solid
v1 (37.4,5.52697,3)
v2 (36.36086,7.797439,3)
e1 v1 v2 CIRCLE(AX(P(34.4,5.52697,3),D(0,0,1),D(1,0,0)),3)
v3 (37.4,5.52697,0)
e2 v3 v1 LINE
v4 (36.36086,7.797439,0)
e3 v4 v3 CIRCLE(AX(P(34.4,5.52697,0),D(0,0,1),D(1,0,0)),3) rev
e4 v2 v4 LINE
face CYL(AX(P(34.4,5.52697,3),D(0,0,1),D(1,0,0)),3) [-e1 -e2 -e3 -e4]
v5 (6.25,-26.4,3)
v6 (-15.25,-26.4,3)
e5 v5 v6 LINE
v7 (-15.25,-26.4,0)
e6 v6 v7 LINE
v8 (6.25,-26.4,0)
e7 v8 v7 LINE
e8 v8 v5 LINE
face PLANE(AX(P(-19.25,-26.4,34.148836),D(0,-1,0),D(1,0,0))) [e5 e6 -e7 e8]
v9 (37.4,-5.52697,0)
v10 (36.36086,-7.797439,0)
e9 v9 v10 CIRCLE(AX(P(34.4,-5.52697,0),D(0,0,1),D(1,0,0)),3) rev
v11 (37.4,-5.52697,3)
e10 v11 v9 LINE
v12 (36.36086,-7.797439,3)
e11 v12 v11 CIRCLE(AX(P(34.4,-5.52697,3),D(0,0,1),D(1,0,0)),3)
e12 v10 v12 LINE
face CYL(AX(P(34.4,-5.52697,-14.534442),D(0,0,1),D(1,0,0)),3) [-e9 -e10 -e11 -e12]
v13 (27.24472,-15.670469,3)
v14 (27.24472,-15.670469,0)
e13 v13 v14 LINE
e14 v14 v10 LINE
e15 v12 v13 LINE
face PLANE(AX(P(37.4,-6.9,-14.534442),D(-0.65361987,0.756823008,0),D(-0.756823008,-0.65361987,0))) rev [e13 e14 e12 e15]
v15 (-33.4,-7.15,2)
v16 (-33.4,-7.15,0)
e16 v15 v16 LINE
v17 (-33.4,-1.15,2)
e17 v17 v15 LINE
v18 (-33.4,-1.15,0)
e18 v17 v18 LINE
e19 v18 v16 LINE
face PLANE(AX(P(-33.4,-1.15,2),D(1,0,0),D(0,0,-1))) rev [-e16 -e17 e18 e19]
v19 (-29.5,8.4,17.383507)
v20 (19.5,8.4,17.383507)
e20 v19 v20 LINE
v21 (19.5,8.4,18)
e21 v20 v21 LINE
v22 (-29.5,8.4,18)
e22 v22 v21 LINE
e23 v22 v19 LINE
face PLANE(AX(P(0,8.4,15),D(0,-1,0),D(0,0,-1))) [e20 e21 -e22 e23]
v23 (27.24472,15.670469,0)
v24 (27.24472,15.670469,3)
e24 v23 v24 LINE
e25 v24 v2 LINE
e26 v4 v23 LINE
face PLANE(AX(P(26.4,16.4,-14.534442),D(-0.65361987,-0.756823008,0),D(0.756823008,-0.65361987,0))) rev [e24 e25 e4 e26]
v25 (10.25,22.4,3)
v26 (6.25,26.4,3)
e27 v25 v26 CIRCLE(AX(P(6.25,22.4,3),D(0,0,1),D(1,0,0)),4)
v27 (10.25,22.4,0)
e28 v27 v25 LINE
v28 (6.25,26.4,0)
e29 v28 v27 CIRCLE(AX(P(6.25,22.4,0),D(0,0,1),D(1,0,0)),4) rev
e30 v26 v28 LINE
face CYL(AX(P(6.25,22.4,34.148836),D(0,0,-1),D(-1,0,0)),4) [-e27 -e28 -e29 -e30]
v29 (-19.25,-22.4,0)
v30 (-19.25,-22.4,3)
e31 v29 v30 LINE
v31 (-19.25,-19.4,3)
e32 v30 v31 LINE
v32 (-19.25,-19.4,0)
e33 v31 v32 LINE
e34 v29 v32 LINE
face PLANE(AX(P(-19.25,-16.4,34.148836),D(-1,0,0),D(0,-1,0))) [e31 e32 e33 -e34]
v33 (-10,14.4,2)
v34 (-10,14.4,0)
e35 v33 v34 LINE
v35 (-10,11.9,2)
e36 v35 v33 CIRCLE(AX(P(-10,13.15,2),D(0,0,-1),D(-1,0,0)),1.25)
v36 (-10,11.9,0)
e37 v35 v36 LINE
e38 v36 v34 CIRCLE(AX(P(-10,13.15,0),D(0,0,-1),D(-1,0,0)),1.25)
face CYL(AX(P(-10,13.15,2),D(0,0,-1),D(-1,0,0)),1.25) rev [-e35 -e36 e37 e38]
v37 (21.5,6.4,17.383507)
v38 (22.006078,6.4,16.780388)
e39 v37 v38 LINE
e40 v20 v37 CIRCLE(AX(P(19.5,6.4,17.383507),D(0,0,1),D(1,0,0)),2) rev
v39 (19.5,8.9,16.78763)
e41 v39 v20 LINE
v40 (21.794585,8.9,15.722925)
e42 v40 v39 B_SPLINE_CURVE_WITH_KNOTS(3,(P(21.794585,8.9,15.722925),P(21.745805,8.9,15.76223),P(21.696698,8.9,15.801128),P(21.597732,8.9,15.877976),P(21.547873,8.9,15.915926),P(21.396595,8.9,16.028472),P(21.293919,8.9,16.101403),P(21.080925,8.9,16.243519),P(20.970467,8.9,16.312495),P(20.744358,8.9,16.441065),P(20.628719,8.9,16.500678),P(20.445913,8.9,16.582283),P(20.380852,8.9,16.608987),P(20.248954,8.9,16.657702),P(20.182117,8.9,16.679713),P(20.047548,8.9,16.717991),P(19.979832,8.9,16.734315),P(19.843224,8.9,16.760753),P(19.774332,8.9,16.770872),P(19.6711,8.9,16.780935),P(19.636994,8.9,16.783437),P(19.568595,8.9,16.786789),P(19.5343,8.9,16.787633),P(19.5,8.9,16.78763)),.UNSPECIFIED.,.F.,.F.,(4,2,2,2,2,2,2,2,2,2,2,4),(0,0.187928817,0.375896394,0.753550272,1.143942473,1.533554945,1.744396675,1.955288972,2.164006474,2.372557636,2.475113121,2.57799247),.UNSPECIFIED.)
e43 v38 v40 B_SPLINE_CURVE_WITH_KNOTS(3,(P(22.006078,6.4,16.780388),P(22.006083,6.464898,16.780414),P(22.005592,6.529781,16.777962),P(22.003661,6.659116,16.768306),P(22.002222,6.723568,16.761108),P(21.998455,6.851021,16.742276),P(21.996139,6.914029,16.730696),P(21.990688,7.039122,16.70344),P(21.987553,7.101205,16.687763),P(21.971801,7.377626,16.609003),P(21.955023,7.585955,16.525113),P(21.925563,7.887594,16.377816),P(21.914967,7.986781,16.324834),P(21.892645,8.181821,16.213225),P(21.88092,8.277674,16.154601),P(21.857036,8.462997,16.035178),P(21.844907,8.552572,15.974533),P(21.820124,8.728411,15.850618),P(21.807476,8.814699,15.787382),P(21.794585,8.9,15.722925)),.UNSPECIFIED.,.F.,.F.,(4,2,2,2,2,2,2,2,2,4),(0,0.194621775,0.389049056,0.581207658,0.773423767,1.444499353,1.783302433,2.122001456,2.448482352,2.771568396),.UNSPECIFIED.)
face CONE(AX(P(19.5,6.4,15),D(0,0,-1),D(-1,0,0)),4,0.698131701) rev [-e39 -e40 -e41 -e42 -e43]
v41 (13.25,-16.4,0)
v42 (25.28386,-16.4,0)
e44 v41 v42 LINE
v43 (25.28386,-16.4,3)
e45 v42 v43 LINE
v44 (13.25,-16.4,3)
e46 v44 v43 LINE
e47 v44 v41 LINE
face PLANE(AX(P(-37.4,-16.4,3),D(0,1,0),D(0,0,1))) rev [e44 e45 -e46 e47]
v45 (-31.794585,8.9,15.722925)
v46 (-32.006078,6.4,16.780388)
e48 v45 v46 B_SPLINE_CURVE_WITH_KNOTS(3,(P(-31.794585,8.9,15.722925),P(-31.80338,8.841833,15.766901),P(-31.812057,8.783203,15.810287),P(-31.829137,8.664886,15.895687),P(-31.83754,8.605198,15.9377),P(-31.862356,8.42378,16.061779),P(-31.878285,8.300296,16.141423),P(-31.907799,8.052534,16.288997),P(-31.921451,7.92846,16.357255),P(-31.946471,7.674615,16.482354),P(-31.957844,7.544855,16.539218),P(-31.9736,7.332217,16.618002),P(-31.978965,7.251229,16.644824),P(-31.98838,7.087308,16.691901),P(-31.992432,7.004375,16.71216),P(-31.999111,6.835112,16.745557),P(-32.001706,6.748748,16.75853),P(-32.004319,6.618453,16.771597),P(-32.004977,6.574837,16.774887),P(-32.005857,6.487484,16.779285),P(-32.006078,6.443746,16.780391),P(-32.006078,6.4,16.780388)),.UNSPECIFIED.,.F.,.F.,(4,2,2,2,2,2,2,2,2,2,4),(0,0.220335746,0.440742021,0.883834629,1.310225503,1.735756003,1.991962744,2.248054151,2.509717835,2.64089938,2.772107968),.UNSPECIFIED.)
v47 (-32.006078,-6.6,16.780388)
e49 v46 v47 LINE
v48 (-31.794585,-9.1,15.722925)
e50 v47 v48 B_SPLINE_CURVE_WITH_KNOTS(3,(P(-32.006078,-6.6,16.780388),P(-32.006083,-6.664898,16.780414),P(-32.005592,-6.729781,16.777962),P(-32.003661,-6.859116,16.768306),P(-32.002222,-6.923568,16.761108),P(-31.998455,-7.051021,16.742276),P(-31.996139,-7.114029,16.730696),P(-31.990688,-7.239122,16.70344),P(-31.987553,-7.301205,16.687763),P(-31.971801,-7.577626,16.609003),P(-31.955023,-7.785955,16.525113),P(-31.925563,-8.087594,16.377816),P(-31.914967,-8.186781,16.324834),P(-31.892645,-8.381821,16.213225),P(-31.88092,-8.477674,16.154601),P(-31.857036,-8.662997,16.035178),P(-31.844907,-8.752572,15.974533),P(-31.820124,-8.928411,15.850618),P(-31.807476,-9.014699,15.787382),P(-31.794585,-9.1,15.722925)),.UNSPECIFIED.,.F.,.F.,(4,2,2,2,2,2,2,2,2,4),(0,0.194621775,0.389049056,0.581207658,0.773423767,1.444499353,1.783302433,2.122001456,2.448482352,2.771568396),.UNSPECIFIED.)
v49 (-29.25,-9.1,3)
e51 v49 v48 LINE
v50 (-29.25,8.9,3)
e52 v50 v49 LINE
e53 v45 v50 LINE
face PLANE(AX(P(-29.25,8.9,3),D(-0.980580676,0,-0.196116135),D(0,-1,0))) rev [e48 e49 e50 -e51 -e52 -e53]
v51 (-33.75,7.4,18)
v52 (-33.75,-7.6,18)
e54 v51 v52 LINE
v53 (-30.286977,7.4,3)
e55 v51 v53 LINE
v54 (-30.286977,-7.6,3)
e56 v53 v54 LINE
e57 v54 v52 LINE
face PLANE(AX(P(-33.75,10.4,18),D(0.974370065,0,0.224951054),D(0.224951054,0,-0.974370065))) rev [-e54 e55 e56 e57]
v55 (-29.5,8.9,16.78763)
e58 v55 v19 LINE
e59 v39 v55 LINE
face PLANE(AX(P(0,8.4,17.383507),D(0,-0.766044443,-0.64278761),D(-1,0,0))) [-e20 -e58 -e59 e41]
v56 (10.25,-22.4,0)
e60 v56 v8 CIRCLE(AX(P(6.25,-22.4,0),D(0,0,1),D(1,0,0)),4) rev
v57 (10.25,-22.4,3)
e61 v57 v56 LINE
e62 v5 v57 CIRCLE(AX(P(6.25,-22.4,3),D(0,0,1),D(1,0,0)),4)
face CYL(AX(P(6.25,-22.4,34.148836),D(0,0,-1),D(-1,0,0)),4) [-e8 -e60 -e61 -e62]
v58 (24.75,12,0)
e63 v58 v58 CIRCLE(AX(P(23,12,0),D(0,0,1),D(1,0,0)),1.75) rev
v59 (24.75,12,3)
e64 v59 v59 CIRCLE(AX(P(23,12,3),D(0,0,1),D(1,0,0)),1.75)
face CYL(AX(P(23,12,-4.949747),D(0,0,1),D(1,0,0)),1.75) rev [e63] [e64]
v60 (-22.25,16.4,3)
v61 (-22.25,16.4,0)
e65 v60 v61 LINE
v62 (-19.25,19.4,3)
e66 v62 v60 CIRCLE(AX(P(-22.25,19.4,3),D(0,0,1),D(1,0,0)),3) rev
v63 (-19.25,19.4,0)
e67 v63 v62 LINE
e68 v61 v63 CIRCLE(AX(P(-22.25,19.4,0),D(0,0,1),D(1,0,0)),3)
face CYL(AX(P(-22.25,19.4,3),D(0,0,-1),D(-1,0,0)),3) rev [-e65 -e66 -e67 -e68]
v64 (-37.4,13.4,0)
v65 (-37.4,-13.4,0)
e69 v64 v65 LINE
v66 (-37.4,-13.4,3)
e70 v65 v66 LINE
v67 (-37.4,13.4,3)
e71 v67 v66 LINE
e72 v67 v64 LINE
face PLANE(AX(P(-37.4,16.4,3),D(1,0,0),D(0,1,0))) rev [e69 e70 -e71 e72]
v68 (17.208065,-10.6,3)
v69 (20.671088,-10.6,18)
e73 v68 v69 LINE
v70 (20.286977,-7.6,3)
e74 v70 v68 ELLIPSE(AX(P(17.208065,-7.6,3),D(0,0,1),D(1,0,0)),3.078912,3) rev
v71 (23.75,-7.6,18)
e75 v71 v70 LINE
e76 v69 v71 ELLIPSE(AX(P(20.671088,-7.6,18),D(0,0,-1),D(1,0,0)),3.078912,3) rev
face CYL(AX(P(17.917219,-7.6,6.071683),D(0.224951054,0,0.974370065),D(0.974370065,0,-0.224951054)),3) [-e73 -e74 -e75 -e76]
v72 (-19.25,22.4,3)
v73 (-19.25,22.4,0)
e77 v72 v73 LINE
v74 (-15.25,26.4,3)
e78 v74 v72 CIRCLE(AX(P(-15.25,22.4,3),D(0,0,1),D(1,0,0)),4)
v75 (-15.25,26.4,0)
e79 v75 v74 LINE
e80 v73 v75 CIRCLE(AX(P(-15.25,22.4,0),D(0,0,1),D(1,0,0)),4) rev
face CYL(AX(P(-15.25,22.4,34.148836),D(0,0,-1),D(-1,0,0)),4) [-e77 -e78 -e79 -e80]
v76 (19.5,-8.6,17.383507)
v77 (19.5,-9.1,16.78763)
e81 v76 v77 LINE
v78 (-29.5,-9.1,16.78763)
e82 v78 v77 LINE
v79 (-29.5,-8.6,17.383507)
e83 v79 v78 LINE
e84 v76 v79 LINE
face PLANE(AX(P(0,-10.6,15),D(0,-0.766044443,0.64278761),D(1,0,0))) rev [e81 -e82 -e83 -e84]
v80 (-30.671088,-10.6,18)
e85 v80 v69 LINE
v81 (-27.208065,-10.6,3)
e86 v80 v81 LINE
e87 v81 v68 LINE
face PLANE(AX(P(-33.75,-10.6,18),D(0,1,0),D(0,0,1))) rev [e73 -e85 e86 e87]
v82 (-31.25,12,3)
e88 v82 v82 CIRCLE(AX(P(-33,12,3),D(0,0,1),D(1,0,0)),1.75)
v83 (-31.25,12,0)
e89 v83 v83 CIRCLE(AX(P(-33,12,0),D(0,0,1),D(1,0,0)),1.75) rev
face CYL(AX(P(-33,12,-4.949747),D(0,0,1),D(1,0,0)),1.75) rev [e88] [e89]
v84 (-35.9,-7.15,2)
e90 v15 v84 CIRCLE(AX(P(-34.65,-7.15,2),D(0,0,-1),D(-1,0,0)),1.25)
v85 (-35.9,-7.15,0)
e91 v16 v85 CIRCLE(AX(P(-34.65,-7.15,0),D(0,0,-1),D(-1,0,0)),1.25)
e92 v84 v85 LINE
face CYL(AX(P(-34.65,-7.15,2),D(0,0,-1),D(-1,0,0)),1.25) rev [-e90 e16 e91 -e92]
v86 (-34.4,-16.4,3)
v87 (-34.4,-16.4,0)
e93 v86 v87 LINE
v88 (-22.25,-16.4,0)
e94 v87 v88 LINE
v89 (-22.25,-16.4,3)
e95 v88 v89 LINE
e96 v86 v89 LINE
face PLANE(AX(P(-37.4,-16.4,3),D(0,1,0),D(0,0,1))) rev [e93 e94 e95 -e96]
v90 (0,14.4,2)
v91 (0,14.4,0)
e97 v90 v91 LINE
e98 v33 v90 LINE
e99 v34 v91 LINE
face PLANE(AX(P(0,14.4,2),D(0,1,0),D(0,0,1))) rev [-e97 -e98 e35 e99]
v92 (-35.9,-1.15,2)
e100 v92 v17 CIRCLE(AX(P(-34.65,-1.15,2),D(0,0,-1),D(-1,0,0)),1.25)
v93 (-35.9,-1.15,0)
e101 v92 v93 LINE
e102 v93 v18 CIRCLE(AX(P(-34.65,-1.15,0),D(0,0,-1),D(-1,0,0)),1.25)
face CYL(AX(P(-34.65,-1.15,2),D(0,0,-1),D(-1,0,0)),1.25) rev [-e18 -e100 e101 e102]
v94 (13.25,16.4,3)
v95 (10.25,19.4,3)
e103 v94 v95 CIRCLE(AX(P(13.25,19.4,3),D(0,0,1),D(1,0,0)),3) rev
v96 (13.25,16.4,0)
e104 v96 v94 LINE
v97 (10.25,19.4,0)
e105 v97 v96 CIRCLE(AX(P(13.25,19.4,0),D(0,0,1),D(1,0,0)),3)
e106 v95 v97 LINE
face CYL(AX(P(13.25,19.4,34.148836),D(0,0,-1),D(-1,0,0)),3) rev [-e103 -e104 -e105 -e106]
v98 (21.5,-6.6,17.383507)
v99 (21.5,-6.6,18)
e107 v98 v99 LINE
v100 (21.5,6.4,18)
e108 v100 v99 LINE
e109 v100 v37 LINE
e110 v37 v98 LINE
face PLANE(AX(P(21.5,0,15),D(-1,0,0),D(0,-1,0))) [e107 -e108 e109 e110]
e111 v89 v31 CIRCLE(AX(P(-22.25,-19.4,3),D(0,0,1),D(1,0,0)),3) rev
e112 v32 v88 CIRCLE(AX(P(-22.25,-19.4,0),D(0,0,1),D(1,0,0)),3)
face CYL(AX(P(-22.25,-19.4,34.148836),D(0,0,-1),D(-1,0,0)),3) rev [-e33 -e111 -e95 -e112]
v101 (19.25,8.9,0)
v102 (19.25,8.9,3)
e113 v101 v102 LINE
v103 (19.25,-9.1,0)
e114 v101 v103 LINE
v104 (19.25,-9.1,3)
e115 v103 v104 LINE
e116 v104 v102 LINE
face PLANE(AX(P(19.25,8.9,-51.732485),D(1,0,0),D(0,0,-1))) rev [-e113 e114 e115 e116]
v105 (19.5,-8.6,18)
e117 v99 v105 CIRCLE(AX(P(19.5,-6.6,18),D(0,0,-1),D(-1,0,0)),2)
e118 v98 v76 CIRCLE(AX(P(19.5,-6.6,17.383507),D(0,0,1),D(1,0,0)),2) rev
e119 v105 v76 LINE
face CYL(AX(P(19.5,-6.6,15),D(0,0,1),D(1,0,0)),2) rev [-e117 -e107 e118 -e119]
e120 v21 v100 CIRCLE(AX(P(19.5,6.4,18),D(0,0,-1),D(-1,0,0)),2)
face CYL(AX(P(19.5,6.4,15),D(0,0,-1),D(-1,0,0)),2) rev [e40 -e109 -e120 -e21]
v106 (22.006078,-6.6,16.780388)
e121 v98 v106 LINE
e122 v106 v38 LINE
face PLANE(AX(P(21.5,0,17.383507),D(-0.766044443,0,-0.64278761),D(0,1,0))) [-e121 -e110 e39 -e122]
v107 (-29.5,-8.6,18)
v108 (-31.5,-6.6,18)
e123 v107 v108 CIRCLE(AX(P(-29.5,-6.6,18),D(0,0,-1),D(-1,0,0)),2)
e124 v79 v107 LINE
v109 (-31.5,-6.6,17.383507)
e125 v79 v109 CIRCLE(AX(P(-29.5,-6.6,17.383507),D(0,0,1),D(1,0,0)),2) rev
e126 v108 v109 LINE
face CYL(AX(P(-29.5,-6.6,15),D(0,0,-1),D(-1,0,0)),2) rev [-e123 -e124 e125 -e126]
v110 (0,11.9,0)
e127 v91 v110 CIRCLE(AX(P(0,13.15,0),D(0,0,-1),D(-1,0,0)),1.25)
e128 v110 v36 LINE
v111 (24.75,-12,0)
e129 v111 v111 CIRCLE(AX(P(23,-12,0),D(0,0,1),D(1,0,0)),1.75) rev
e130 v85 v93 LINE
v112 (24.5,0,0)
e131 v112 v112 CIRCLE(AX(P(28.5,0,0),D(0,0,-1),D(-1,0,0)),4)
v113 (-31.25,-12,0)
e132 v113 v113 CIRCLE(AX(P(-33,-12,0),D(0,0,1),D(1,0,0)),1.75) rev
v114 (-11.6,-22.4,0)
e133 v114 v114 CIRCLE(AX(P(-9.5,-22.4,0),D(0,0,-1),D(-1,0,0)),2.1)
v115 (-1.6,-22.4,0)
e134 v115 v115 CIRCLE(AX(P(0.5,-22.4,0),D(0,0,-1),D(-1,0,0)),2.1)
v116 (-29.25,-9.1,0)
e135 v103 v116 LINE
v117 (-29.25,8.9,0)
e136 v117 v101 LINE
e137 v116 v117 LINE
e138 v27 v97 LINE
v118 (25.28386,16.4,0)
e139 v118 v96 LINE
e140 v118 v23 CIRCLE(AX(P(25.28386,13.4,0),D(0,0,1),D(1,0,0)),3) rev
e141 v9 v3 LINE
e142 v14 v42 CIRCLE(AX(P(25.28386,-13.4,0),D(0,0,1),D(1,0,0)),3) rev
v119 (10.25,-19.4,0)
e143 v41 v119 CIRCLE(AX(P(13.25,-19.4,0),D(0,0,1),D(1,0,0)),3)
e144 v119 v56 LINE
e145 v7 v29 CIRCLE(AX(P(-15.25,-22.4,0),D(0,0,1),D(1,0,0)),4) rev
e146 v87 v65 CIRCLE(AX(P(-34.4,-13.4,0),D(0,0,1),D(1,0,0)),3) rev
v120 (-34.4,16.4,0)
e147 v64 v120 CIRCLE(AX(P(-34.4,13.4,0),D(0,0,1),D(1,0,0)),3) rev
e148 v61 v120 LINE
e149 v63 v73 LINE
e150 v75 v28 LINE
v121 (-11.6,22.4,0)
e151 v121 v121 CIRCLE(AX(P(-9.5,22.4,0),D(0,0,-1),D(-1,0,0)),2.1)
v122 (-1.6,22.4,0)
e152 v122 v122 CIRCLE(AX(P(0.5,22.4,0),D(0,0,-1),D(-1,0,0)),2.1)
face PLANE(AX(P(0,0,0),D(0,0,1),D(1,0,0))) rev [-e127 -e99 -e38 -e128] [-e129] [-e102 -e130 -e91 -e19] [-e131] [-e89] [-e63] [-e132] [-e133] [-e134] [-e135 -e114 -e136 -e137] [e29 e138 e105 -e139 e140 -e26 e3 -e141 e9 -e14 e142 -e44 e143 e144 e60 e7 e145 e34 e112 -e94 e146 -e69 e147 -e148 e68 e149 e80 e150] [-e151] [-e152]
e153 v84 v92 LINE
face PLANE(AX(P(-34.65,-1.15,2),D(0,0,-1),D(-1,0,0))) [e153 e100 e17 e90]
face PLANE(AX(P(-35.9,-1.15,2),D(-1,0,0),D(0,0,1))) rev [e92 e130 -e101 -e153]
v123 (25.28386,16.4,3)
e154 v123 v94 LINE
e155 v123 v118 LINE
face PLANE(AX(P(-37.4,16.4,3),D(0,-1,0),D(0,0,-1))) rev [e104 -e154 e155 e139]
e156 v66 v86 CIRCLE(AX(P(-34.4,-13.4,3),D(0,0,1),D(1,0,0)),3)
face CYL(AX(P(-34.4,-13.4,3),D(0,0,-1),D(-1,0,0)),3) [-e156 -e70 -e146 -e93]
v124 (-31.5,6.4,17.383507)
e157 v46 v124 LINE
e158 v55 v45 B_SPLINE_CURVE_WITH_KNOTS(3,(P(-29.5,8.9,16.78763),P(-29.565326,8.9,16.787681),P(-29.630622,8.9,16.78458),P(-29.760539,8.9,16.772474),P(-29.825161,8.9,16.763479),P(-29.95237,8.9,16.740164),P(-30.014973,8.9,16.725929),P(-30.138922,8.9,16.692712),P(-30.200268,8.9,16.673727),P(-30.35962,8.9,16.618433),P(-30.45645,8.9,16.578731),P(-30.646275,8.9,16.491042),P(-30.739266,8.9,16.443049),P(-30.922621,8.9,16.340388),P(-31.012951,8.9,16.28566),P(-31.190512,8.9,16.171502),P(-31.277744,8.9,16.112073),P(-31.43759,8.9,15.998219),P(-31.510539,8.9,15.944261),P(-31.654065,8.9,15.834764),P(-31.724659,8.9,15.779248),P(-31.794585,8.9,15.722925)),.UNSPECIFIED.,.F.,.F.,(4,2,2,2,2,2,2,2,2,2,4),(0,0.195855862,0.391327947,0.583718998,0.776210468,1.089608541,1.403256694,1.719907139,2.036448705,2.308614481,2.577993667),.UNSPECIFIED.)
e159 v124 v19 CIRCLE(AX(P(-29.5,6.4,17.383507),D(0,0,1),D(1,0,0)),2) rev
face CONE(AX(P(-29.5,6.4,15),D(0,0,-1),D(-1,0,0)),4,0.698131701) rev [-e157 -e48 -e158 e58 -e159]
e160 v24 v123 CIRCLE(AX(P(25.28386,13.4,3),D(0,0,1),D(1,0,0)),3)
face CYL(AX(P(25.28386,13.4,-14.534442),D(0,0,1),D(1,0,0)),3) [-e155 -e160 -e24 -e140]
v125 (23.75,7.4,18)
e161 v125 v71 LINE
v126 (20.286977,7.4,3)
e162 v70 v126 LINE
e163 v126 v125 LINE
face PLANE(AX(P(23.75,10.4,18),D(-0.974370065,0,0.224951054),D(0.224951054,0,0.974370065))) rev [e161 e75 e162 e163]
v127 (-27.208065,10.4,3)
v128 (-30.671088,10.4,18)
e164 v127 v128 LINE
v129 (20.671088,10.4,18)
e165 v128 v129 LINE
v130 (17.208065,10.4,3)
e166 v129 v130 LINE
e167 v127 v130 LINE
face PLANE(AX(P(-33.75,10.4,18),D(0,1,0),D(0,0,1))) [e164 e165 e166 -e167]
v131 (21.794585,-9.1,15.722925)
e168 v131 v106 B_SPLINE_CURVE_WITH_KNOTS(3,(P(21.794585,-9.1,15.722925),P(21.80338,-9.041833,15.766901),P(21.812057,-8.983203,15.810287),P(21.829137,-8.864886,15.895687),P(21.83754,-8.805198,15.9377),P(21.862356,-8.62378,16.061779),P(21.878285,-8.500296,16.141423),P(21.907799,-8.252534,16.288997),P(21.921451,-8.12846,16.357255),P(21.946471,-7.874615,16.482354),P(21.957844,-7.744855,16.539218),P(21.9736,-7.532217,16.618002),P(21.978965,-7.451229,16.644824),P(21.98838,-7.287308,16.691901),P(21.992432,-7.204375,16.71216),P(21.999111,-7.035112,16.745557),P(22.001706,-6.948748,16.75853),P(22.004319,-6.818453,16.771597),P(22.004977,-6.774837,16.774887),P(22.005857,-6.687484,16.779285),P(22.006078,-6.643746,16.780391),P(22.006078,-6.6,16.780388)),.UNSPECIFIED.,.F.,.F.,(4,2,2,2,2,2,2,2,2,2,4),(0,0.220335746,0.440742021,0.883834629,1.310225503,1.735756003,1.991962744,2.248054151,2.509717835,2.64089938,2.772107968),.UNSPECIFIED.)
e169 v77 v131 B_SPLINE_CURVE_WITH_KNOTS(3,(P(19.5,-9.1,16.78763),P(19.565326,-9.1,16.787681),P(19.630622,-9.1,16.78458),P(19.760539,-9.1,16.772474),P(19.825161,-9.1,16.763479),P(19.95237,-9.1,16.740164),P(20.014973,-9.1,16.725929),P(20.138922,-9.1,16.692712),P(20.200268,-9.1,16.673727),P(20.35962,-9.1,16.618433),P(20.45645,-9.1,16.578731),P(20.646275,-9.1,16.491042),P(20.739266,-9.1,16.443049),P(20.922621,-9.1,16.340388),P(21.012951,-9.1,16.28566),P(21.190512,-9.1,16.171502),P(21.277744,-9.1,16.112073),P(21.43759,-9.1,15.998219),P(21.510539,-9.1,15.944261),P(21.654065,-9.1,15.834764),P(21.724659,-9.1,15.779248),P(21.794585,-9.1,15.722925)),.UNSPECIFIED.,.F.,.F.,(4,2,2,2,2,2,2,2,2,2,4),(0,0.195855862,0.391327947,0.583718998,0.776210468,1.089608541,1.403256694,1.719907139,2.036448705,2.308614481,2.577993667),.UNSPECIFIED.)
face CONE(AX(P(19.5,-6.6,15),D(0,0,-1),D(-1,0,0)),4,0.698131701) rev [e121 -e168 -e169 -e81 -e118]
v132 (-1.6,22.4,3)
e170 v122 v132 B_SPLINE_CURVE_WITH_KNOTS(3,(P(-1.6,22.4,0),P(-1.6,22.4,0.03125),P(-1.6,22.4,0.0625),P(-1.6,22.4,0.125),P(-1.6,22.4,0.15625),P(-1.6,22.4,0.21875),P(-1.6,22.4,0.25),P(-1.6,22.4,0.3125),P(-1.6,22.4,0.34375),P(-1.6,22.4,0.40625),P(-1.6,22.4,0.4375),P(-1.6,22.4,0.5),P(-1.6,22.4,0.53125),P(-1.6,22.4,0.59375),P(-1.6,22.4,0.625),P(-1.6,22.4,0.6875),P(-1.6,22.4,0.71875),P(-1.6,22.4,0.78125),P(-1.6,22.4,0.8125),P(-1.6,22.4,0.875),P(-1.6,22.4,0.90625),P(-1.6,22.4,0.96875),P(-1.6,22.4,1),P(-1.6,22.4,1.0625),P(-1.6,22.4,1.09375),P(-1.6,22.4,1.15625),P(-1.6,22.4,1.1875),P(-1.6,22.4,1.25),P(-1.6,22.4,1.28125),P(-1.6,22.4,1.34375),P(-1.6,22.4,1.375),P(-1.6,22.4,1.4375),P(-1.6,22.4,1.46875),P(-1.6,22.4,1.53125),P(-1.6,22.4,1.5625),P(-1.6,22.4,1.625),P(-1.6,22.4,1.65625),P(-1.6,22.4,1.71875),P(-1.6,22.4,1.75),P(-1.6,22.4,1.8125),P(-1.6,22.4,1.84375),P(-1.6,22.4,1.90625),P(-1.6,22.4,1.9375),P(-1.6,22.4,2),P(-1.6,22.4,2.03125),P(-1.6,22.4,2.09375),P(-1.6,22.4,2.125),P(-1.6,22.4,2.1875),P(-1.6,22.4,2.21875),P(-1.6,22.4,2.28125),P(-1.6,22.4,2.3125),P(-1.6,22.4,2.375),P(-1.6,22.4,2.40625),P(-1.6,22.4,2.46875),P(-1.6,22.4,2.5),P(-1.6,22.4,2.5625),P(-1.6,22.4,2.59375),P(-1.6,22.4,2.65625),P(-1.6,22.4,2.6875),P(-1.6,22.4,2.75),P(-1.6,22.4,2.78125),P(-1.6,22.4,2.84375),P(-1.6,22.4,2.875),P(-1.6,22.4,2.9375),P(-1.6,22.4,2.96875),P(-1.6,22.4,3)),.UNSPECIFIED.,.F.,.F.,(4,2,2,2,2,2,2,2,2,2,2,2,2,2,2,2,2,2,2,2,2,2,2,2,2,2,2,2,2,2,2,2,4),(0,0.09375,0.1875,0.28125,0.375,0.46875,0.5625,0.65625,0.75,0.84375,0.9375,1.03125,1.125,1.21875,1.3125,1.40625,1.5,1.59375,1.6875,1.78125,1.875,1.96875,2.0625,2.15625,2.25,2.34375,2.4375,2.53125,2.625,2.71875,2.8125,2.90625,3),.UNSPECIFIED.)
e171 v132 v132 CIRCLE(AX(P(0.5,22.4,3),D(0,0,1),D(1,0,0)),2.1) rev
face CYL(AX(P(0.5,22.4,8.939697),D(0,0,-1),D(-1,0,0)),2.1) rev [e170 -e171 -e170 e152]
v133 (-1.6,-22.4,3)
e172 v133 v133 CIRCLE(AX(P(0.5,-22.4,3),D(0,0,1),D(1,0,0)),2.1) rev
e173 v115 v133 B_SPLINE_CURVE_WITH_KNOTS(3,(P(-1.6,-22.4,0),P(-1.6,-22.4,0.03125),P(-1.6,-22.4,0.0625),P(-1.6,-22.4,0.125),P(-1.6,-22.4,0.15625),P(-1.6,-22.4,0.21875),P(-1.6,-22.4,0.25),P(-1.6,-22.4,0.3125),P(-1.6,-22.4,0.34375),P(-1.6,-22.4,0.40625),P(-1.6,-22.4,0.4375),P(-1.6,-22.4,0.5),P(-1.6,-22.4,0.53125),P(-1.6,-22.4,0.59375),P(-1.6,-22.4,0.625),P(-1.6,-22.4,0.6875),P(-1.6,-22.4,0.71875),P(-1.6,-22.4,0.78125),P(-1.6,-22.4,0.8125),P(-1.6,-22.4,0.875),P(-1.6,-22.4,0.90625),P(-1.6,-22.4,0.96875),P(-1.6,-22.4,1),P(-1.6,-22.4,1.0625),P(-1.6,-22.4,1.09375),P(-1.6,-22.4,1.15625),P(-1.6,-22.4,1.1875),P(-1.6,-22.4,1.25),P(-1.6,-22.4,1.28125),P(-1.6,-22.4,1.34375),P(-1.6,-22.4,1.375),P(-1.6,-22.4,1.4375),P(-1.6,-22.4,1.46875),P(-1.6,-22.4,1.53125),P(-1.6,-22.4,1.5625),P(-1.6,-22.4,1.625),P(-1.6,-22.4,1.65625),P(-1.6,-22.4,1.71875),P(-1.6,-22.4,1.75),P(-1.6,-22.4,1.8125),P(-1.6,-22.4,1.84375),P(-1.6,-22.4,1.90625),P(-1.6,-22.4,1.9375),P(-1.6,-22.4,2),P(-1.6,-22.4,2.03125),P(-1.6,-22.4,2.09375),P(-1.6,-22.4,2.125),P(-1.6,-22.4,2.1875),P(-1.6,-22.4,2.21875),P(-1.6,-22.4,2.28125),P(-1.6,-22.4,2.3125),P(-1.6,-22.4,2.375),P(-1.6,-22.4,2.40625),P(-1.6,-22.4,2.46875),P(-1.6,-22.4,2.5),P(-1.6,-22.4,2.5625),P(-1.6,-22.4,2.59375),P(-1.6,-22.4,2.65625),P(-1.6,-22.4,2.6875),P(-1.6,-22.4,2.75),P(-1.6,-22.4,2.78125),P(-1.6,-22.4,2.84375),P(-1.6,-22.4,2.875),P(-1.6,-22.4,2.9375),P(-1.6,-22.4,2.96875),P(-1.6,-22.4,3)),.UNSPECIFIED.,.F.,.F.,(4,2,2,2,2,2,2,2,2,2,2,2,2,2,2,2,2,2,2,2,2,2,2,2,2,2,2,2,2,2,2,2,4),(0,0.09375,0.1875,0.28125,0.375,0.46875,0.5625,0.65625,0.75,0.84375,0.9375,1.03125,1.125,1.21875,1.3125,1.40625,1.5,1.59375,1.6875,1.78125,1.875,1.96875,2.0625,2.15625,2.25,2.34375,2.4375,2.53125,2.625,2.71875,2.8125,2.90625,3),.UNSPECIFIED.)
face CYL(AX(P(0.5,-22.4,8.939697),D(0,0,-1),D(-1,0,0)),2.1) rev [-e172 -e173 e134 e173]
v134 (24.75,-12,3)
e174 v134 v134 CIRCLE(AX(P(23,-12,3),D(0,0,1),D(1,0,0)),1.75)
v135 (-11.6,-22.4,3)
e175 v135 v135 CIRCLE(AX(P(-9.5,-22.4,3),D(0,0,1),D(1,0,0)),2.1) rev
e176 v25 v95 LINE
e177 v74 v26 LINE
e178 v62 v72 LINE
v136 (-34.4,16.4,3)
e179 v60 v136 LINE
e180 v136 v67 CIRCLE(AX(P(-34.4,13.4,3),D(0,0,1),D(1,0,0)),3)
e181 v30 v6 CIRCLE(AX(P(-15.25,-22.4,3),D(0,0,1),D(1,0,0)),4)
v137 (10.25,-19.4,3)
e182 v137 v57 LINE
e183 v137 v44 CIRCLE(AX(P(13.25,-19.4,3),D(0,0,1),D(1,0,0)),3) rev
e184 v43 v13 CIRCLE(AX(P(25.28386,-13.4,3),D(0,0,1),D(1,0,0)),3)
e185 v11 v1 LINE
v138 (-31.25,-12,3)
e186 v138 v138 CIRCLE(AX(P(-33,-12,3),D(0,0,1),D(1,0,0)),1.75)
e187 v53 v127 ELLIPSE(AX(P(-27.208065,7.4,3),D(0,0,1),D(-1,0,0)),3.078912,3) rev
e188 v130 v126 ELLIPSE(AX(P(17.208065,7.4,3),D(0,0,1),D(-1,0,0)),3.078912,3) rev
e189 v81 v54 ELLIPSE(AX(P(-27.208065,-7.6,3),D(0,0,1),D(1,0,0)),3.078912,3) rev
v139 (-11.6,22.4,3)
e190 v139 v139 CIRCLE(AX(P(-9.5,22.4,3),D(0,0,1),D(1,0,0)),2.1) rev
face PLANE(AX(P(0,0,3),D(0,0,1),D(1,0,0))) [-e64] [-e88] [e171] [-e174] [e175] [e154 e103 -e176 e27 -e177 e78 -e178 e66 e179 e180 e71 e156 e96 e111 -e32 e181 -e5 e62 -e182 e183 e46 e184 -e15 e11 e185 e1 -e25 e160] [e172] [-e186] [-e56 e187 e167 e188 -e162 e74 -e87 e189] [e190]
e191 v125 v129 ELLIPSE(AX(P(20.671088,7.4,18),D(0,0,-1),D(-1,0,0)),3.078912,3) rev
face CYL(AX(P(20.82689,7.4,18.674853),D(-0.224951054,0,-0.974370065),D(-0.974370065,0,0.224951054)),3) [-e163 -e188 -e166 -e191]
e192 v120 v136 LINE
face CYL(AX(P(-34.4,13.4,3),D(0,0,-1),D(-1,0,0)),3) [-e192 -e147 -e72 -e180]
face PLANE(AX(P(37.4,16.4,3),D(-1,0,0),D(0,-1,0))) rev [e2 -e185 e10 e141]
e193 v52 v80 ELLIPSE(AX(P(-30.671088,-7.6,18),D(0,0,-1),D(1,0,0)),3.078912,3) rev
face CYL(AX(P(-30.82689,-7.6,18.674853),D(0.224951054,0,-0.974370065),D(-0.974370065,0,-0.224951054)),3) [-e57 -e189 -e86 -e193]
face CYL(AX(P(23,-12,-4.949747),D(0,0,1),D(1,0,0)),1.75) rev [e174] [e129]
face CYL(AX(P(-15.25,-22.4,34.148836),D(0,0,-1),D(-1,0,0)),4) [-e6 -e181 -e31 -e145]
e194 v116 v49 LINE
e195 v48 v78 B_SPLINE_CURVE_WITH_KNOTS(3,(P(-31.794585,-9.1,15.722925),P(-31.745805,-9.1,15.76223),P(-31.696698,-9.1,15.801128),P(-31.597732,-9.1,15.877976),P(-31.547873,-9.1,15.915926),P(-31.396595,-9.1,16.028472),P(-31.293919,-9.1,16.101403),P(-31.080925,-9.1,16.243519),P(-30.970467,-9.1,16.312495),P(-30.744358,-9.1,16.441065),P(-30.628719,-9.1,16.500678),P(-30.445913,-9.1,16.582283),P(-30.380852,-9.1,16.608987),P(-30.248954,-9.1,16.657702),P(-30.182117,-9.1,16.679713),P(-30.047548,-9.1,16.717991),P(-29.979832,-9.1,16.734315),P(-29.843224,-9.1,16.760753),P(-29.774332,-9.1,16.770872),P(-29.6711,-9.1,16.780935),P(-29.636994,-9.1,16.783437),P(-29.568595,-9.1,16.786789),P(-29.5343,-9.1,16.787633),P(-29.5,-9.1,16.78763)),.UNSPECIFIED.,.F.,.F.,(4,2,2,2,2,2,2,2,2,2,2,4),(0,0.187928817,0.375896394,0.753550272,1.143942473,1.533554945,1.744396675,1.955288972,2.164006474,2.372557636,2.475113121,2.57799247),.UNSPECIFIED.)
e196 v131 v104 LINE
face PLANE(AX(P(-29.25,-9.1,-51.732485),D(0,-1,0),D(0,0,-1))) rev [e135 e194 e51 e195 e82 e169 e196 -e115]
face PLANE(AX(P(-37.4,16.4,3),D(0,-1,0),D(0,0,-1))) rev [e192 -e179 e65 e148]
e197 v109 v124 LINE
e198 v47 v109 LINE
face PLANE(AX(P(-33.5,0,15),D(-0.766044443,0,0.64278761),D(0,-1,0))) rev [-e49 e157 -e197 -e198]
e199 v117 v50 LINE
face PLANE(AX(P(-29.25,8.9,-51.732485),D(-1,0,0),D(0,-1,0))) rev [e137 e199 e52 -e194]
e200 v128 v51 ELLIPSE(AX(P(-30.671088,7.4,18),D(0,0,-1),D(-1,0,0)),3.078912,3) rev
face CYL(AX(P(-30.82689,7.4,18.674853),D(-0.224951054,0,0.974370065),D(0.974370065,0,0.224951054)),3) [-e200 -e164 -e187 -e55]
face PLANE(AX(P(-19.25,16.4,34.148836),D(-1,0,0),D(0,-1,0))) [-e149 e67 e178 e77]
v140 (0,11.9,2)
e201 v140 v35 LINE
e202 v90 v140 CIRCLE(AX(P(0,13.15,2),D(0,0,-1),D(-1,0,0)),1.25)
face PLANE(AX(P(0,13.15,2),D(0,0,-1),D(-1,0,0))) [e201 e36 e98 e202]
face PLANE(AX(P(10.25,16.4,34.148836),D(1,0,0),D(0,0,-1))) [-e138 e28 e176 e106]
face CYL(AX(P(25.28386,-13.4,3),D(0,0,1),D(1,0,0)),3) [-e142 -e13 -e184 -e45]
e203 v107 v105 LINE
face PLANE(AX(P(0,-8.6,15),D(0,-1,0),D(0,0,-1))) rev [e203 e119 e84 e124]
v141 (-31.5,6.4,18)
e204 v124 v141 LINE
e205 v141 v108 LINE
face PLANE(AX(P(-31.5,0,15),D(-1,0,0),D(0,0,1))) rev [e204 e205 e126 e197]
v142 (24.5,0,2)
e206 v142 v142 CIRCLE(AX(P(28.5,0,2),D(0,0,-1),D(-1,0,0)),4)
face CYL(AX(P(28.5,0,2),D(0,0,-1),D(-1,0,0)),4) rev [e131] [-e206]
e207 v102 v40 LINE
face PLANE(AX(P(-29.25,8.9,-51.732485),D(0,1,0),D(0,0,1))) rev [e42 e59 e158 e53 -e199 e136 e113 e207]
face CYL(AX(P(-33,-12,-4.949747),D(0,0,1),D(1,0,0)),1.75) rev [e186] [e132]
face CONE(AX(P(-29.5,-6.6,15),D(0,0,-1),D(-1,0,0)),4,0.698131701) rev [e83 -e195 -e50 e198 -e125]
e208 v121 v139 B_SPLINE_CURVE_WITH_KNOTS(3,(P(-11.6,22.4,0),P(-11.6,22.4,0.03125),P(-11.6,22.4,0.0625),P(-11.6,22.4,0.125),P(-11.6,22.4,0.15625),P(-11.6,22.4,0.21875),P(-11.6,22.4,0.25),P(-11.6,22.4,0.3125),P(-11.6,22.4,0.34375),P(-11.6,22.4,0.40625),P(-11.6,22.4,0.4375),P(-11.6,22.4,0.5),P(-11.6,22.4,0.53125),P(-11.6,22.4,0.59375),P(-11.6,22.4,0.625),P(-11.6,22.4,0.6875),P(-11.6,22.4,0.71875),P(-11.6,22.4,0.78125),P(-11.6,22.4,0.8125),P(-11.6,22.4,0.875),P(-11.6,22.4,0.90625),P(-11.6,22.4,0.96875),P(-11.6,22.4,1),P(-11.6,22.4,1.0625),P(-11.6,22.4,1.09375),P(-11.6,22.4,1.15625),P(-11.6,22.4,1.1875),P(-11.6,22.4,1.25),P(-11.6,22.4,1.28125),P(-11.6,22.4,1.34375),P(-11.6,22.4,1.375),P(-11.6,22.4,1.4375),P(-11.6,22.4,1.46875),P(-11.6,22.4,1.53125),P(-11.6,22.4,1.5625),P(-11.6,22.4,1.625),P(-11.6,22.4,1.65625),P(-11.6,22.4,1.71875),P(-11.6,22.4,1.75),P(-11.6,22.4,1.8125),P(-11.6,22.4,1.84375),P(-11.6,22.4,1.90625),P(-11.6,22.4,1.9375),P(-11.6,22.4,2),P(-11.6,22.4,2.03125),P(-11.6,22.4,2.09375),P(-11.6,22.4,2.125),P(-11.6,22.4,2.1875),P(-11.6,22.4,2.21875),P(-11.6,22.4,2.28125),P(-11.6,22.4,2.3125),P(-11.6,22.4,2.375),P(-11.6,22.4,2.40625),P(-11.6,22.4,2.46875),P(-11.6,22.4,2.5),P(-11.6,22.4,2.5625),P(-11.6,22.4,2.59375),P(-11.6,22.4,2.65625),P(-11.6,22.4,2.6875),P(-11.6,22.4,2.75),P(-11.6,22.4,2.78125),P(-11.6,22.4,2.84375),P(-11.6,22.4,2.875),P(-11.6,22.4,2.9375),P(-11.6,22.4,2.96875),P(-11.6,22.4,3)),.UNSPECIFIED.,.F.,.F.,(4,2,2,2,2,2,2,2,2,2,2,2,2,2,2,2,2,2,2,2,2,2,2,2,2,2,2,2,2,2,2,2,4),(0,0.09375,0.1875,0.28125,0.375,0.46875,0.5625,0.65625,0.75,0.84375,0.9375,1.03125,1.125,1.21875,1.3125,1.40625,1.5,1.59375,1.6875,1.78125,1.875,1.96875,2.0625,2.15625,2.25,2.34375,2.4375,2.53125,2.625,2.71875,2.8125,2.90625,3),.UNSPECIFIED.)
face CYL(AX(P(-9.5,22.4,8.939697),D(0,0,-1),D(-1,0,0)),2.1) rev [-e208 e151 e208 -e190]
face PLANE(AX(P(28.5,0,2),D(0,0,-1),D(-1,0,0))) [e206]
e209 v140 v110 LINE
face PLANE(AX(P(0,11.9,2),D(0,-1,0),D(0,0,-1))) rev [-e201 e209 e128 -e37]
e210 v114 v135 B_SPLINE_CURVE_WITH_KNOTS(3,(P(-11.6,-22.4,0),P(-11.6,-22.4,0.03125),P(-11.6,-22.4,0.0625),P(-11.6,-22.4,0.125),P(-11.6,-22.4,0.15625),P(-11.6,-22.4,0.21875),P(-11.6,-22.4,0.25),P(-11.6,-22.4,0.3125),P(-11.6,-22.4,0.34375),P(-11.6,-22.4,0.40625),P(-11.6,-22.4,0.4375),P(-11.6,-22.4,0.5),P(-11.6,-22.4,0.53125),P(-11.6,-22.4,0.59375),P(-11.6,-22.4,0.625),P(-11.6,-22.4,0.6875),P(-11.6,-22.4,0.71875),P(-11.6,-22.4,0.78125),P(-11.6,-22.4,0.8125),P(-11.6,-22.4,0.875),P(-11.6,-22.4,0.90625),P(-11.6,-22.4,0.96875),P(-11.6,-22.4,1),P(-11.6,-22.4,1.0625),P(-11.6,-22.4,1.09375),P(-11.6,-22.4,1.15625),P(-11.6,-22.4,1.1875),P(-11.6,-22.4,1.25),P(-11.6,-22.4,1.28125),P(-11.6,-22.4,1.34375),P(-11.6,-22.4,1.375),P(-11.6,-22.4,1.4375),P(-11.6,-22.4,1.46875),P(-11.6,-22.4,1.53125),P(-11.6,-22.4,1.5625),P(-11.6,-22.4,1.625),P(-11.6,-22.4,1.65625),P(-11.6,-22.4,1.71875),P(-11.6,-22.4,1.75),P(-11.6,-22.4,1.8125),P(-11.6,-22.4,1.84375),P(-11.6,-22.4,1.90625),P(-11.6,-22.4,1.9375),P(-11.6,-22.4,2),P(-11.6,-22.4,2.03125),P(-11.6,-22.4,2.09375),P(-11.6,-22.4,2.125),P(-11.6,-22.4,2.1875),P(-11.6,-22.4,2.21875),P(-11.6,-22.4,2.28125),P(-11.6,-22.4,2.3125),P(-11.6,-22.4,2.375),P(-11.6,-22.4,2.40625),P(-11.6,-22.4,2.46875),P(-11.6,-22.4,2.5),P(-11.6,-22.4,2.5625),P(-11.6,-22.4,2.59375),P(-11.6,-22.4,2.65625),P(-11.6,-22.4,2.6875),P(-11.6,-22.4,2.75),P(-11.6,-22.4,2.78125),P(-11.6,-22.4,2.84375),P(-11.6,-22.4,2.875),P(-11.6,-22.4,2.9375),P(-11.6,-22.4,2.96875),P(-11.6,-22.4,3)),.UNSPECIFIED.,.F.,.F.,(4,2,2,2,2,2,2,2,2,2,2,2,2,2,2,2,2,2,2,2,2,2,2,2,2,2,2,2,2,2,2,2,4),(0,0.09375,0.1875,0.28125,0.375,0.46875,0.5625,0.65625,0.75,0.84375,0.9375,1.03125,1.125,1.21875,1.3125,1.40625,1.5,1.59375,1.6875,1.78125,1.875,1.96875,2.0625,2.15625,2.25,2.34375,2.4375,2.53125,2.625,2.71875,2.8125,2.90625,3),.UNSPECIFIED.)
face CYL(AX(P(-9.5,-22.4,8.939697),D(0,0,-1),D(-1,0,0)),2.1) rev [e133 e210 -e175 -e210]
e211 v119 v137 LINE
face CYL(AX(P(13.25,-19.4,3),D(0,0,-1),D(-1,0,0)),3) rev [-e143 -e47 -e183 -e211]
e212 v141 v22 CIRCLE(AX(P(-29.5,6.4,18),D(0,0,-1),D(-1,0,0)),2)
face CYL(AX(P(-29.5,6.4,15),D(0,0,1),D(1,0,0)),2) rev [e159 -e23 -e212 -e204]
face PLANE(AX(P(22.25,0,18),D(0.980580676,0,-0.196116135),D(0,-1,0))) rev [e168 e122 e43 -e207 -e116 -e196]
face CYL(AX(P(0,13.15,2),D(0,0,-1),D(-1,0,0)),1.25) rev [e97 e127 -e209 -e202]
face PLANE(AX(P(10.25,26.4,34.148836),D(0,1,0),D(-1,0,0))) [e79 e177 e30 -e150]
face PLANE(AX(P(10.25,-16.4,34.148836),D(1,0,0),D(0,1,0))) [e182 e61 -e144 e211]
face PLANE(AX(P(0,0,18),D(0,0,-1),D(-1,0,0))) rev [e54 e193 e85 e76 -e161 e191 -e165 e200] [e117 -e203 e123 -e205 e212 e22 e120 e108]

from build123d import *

# Parameters (mm, degrees)
SKETCH1_W           = 74.8
SKETCH1_H           = 32.8
BOSS_EXTRUDE1_DEPTH = 3
CUT_EXTRUDE1_DEPTH  = 3
SKETCH3_R           = 1.75
CUT_EXTRUDE2_DEPTH  = 3
SKETCH4_W           = 48.5
SKETCH4_H           = 18
CUT_EXTRUDE3_DEPTH  = 3
SKETCH5_W           = 57.5
SKETCH5_H           = 21
SKETCH5_W_2         = 48.5
SKETCH5_H_2         = 18
BOSS_EXTRUDE3_DEPTH = 15
CUT_EXTRUDE11_START = -10.6
CUT_EXTRUDE11_DEPTH = 21
CHAMFER1_SIZE       = 15
CHAMFER1_SIZE2      = 3
CHAMFER2_SIZE       = 3
CHAMFER2_SIZE2      = 15
SKETCH18_W          = 54.5
SKETCH18_H          = 18
SKETCH18_W_2        = 53
SKETCH18_H_2        = 17
BOSS_EXTRUDE6_DEPTH = 3
SKETCH12_W          = 29.5
SKETCH12_H          = 10
BOSS_EXTRUDE5_DEPTH = 3
SKETCH13_R          = 2.1
CUT_EXTRUDE9_DEPTH  = 3
FILLET2_R           = 3
FILLET3_R           = 3
FILLET4_R           = 4
FILLET5_R           = 3
FILLET11_R          = 2
CHAMFER11_SIZE      = 2.383507185
CHAMFER11_SIZE_2    = 2
CUT_EXTRUDE12_DEPTH = 2
CUT_EXTRUDE13_DEPTH = 2
SKETCH21_R          = 4
CUT_EXTRUDE14_DEPTH = 2


# Read off the part's stored shape, not the designer's step: Cut-Extrude11
with BuildPart() as part:
    # Sketch1 → Boss-Extrude1 (new body)
    with BuildSketch(Plane.XY):
        Rectangle(SKETCH1_W, SKETCH1_H)
    extrude(amount=BOSS_EXTRUDE1_DEPTH)

    # Sketch2 → Cut-Extrude1 (cut)
    with BuildSketch(Plane.XY.offset(3)):
        Polygon((37.4, 16.4), (26.4, 16.4), (37.4, 6.9), align=None)
        Polygon((37.4, -16.4), (37.4, -6.9), (26.4, -16.4), align=None)
    extrude(amount=-CUT_EXTRUDE1_DEPTH, mode=Mode.SUBTRACT)

    # Sketch3 → Cut-Extrude2 (cut)
    with BuildSketch(Plane.XY.offset(3)):
        with Locations((-33, 12)):
            Circle(SKETCH3_R)
        with Locations((-33, -12)):
            Circle(SKETCH3_R)
        with Locations((23, -12)):
            Circle(SKETCH3_R)
        with Locations((23, 12)):
            Circle(SKETCH3_R)
    extrude(amount=-CUT_EXTRUDE2_DEPTH, mode=Mode.SUBTRACT)

    # Sketch4 → Cut-Extrude3 (cut)
    with BuildSketch(Plane.XY.offset(3)):
        with Locations((-5, -0.1)):
            Rectangle(SKETCH4_W, SKETCH4_H)
    extrude(amount=-CUT_EXTRUDE3_DEPTH, mode=Mode.SUBTRACT)

    # Sketch5 → Boss-Extrude3 (add)
    with BuildSketch(Plane.XY.offset(3)):
        with Locations((-5, -0.1)):
            Rectangle(SKETCH5_W, SKETCH5_H)
        with Locations((-5, -0.1)):
            Rectangle(SKETCH5_W_2, SKETCH5_H_2, mode=Mode.SUBTRACT)
    extrude(amount=BOSS_EXTRUDE3_DEPTH)

    # Cut-Extrude11 outline → Cut-Extrude11 (cut)
    with BuildSketch(Plane(origin=(0, 0, 0), x_dir=(1, 0, 0), z_dir=(0, 1, 0)).offset(CUT_EXTRUDE11_START)):
        Polygon((-33.75, -3), (-33.75, -18), (-30.286977133, -3), align=None)
        Polygon((23.75, -3), (20.286977133, -3), (23.75, -18), align=None)
    extrude(amount=CUT_EXTRUDE11_DEPTH, mode=Mode.SUBTRACT)

    # Chamfer1
    chamfer1_edges = [part.edges().sort_by_distance(p)[0] for p in [
        (19.25, -0.1, 18),
    ]]
    chamfer1_side = [part.faces().sort_by_distance(p)[0] for p in [
        (19.25, -0.1, 9),
    ]]
    chamfer(chamfer1_edges, length=CHAMFER1_SIZE, length2=CHAMFER1_SIZE2, reference=chamfer1_side[0])

    # Chamfer2
    chamfer2_edges = [part.edges().sort_by_distance(p)[0] for p in [
        (-29.25, -0.1, 18),
    ]]
    chamfer2_side = [part.faces().sort_by_distance(p)[0] for p in [
        (-3.5, 9.512147858, 18),
    ]]
    chamfer(chamfer2_edges, length=CHAMFER2_SIZE, length2=CHAMFER2_SIZE2, reference=chamfer2_side[0])

    # Sketch18 → Boss-Extrude6 (add)
    with BuildSketch(Plane.XY.offset(18)):
        with Locations((-5, -0.1)):
            Rectangle(SKETCH18_W, SKETCH18_H)
        with Locations((-5, -0.1)):
            Rectangle(SKETCH18_W_2, SKETCH18_H_2, mode=Mode.SUBTRACT)
    extrude(amount=-BOSS_EXTRUDE6_DEPTH)

    # Sketch12 → Boss-Extrude5 (add)
    with BuildSketch(Plane(origin=(0, 0, 0), x_dir=(-1, 0, 0), z_dir=(0, 0, -1))):
        with Locations((4.5, 21.4)):
            Rectangle(SKETCH12_W, SKETCH12_H)
        with Locations((4.5, -21.4)):
            Rectangle(SKETCH12_W, SKETCH12_H)
    extrude(amount=-BOSS_EXTRUDE5_DEPTH)

    # Sketch13 → Cut-Extrude9 (cut)
    with BuildSketch(Plane(origin=(0, 0, 0), x_dir=(-1, 0, 0), z_dir=(0, 0, -1))):
        with Locations((-0.5, 22.4)):
            Circle(SKETCH13_R)
        with Locations((9.5, 22.4)):
            Circle(SKETCH13_R)
        with Locations((-0.5, -22.4)):
            Circle(SKETCH13_R)
        with Locations((9.5, -22.4)):
            Circle(SKETCH13_R)
    extrude(amount=-CUT_EXTRUDE9_DEPTH, mode=Mode.SUBTRACT)

    # Fillet2
    fillet2_edges = [part.edges().sort_by_distance(p)[0] for p in [
        (22.018488567, 10.4, 10.5),
        (22.018488567, -10.6, 10.5),
        (-32.018488566, -10.6, 10.5),
        (-32.018488566, 10.4, 10.5),
    ]]
    fillet(fillet2_edges, radius=FILLET2_R)

    # Fillet3
    fillet3_edges = [part.edges().sort_by_distance(p)[0] for p in [
        (37.4, 6.9, 1.5),
        (26.4, 16.4, 1.5),
        (26.4, -16.4, 1.5),
        (37.4, -6.9, 1.5),
        (-37.4, -16.4, 1.5),
        (-37.4, 16.4, 1.5),
    ]]
    fillet(fillet3_edges, radius=FILLET3_R)

    # Fillet4
    fillet4_edges = [part.edges().sort_by_distance(p)[0] for p in [
        (-19.25, 26.4, 1.5),
        (10.25, 26.4, 1.5),
        (10.25, -26.4, 1.5),
        (-19.25, -26.4, 1.5),
    ]]
    fillet(fillet4_edges, radius=FILLET4_R)

    # Fillet5
    fillet5_edges = [part.edges().sort_by_distance(p)[0] for p in [
        (-19.25, 16.4, 1.5),
        (10.25, 16.4, 1.5),
        (10.25, -16.4, 1.5),
        (-19.25, -16.4, 1.5),
    ]]
    fillet(fillet5_edges, radius=FILLET5_R)

    # Fillet11
    fillet11_edges = [part.edges().sort_by_distance(p)[0] for p in [
        (21.5, 8.4, 16.5),
        (-31.5, 8.4, 16.5),
        (-31.5, -8.6, 16.5),
        (21.5, -8.6, 16.5),
    ]]
    fillet(fillet11_edges, radius=FILLET11_R)

    # Chamfer11
    # the kernel refuses this chamfer: 2.383507185, 2 mm, written as the material it takes off along each edge
    with BuildSketch(Plane(origin=(-31.5, -6.6, 15), x_dir=(0.024939322090233706, 0, 0.9996889667359941), z_dir=(0, 1, 0))) as chamfer11_piece_1_section:
        Polygon((CHAMFER11_SIZE * 0.999688966815, -CHAMFER11_SIZE * 0.0249393220922), (-CHAMFER11_SIZE_2 * 0.0249393220902, -CHAMFER11_SIZE_2 * 0.999688966736), (0, 0), align=None)
    chamfer11_piece_1 = extrude(amount=13, mode=Mode.PRIVATE)
    chamfer11_piece_1 = split(chamfer11_piece_1, bisect_by=Plane(origin=(-31.892473609, -0.1, 16.212368046), z_dir=(0.9805806756909202, 0, 0.196116135138184)), keep=Keep.TOP, mode=Mode.PRIVATE)
    add(chamfer11_piece_1, mode=Mode.SUBTRACT)
    with BuildSketch(Plane(origin=(19.5, -8.6, 15), x_dir=(0, 0.024939322090234427, 0.9996889667359941), z_dir=(-1, 0, 0))) as chamfer11_piece_2_section:
        Polygon((CHAMFER11_SIZE * 0.999688966815, -CHAMFER11_SIZE * 0.0249393220922), (-CHAMFER11_SIZE_2 * 0.0249393220902, -CHAMFER11_SIZE_2 * 0.999688966736), (0, 0), align=None)
    chamfer11_piece_2 = extrude(amount=49, mode=Mode.PRIVATE)
    chamfer11_piece_2 = split(chamfer11_piece_2, bisect_by=Plane(origin=(-5, -9.1, 16.074399324), z_dir=(0, 1, 0)), keep=Keep.TOP, mode=Mode.PRIVATE)
    add(chamfer11_piece_2, mode=Mode.SUBTRACT)
    with BuildSketch(Plane(origin=(-29.5, 8.4, 15), x_dir=(0, -0.024939322090234427, 0.9996889667359941), z_dir=(1, 0, 0))) as chamfer11_piece_3_section:
        Polygon((CHAMFER11_SIZE * 0.999688966815, -CHAMFER11_SIZE * 0.0249393220922), (-CHAMFER11_SIZE_2 * 0.0249393220902, -CHAMFER11_SIZE_2 * 0.999688966736), (0, 0), align=None)
    chamfer11_piece_3 = extrude(amount=49, mode=Mode.PRIVATE)
    chamfer11_piece_3 = split(chamfer11_piece_3, bisect_by=Plane(origin=(-5, 8.9, 16.074399324), z_dir=(0, -1, 0)), keep=Keep.TOP, mode=Mode.PRIVATE)
    add(chamfer11_piece_3, mode=Mode.SUBTRACT)
    with BuildSketch(Plane(origin=(21.5, 6.4, 15), x_dir=(-0.024939322090233706, 0, 0.9996889667359941), z_dir=(0, -1, 0))) as chamfer11_piece_4_section:
        Polygon((CHAMFER11_SIZE * 0.999688966815, -CHAMFER11_SIZE * 0.0249393220922), (-CHAMFER11_SIZE_2 * 0.0249393220902, -CHAMFER11_SIZE_2 * 0.999688966736), (0, 0), align=None)
    chamfer11_piece_4 = extrude(amount=13, mode=Mode.PRIVATE)
    chamfer11_piece_4 = split(chamfer11_piece_4, bisect_by=Plane(origin=(21.892473609, -0.1, 16.212368046), z_dir=(-0.9805806756909202, 0, 0.19611613513818402)), keep=Keep.TOP, mode=Mode.PRIVATE)
    add(chamfer11_piece_4, mode=Mode.SUBTRACT)
    with BuildSketch(Plane(origin=(-29.5, -6.6, 15), x_dir=(-1, 0, 0), z_dir=(0, 1, 0))) as chamfer11_piece_5_section:
        Polygon((2, CHAMFER11_SIZE), (2 + CHAMFER11_SIZE_2, 0), (2, 0), align=None)
    chamfer11_piece_5 = revolve(axis=Axis((-29.5, -6.6, 15), (0, 0, 1)), revolution_arc=90, mode=Mode.PRIVATE)
    chamfer11_piece_5 = split(chamfer11_piece_5, bisect_by=Plane(origin=(-31.818510416, -8.221304707, 15.842552081), z_dir=(0.9805806756909202, 0, 0.196116135138184)), keep=Keep.TOP, mode=Mode.PRIVATE)
    chamfer11_piece_5 = split(chamfer11_piece_5, bisect_by=Plane(origin=(-30.957610473, -9.1, 16.014732069), z_dir=(0, 1, 0)), keep=Keep.TOP, mode=Mode.PRIVATE)
    add(chamfer11_piece_5, mode=Mode.SUBTRACT)
    with BuildSketch(Plane(origin=(19.5, -6.6, 15), x_dir=(0, -1, 0), z_dir=(-1, 0, 0))) as chamfer11_piece_6_section:
        Polygon((2, CHAMFER11_SIZE), (2 + CHAMFER11_SIZE_2, 0), (2, 0), align=None)
    chamfer11_piece_6 = revolve(axis=Axis((19.5, -6.6, 15), (0, 0, 1)), revolution_arc=90, mode=Mode.PRIVATE)
    chamfer11_piece_6 = split(chamfer11_piece_6, bisect_by=Plane(origin=(21.818510413, -8.221304708, 15.842552067), z_dir=(-0.9805806756909202, 0, 0.19611613513818402)), keep=Keep.TOP, mode=Mode.PRIVATE)
    chamfer11_piece_6 = split(chamfer11_piece_6, bisect_by=Plane(origin=(20.957610477, -9.1, 16.014732055), z_dir=(0, 1, 0)), keep=Keep.TOP, mode=Mode.PRIVATE)
    add(chamfer11_piece_6, mode=Mode.SUBTRACT)
    with BuildSketch(Plane(origin=(-29.5, 6.4, 15), x_dir=(0, 1, 0), z_dir=(1, 0, 0))) as chamfer11_piece_7_section:
        Polygon((2, CHAMFER11_SIZE), (2 + CHAMFER11_SIZE_2, 0), (2, 0), align=None)
    chamfer11_piece_7 = revolve(axis=Axis((-29.5, 6.4, 15), (0, 0, 1)), revolution_arc=90, mode=Mode.PRIVATE)
    chamfer11_piece_7 = split(chamfer11_piece_7, bisect_by=Plane(origin=(-30.957610477, 8.9, 16.014732055), z_dir=(0, -1, 0)), keep=Keep.TOP, mode=Mode.PRIVATE)
    chamfer11_piece_7 = split(chamfer11_piece_7, bisect_by=Plane(origin=(-31.818510413, 8.021304708, 15.842552067), z_dir=(0.9805806756909202, 0, 0.196116135138184)), keep=Keep.TOP, mode=Mode.PRIVATE)
    add(chamfer11_piece_7, mode=Mode.SUBTRACT)
    with BuildSketch(Plane(origin=(19.5, 6.4, 15), x_dir=(0, 1, 0), z_dir=(-1, 0, 0))) as chamfer11_piece_8_section:
        Polygon((2, -CHAMFER11_SIZE), (2 + CHAMFER11_SIZE_2, 0), (2, 0), align=None)
    chamfer11_piece_8 = revolve(axis=Axis((19.5, 6.4, 15), (0, 0, -1)), revolution_arc=90, mode=Mode.PRIVATE)
    chamfer11_piece_8 = split(chamfer11_piece_8, bisect_by=Plane(origin=(21.818510414, 8.021304708, 15.842552069), z_dir=(-0.9805806756909202, 0, 0.19611613513818402)), keep=Keep.TOP, mode=Mode.PRIVATE)
    chamfer11_piece_8 = split(chamfer11_piece_8, bisect_by=Plane(origin=(20.957610476, 8.9, 16.014732056), z_dir=(0, -1, 0)), keep=Keep.TOP, mode=Mode.PRIVATE)
    add(chamfer11_piece_8, mode=Mode.SUBTRACT)

    # Sketch19 → Cut-Extrude12 (cut)
    with BuildSketch(Plane(origin=(0, 0, 0), x_dir=(-1, 0, 0), z_dir=(0, 0, -1))):
        with BuildLine():
            Line((0, 14.4), (10, 14.4))
            ThreePointArc((10, 14.4), (11.25, 13.15), (10, 11.9))
            Line((10, 11.9), (0, 11.9))
            ThreePointArc((0, 11.9), (-1.25, 13.15), (0, 14.4))
        make_face()
    extrude(amount=-CUT_EXTRUDE12_DEPTH, mode=Mode.SUBTRACT)

    # Sketch20 → Cut-Extrude13 (cut)
    with BuildSketch(Plane(origin=(0, 0, 0), x_dir=(-1, 0, 0), z_dir=(0, 0, -1))):
        with BuildLine():
            Line((35.9, -1.15), (35.9, -7.15))
            ThreePointArc((35.9, -7.15), (34.65, -8.4), (33.4, -7.15))
            Line((33.4, -7.15), (33.4, -1.15))
            ThreePointArc((33.4, -1.15), (34.65, 0.1), (35.9, -1.15))
        make_face()
    extrude(amount=-CUT_EXTRUDE13_DEPTH, mode=Mode.SUBTRACT)

    # Sketch21 → Cut-Extrude14 (cut)
    with BuildSketch(Plane(origin=(0, 0, 0), x_dir=(-1, 0, 0), z_dir=(0, 0, -1))):
        with Locations((-28.5, 0)):
            Circle(SKETCH21_R)
    extrude(amount=-CUT_EXTRUDE14_DEPTH, mode=Mode.SUBTRACT)


solid = part.part
